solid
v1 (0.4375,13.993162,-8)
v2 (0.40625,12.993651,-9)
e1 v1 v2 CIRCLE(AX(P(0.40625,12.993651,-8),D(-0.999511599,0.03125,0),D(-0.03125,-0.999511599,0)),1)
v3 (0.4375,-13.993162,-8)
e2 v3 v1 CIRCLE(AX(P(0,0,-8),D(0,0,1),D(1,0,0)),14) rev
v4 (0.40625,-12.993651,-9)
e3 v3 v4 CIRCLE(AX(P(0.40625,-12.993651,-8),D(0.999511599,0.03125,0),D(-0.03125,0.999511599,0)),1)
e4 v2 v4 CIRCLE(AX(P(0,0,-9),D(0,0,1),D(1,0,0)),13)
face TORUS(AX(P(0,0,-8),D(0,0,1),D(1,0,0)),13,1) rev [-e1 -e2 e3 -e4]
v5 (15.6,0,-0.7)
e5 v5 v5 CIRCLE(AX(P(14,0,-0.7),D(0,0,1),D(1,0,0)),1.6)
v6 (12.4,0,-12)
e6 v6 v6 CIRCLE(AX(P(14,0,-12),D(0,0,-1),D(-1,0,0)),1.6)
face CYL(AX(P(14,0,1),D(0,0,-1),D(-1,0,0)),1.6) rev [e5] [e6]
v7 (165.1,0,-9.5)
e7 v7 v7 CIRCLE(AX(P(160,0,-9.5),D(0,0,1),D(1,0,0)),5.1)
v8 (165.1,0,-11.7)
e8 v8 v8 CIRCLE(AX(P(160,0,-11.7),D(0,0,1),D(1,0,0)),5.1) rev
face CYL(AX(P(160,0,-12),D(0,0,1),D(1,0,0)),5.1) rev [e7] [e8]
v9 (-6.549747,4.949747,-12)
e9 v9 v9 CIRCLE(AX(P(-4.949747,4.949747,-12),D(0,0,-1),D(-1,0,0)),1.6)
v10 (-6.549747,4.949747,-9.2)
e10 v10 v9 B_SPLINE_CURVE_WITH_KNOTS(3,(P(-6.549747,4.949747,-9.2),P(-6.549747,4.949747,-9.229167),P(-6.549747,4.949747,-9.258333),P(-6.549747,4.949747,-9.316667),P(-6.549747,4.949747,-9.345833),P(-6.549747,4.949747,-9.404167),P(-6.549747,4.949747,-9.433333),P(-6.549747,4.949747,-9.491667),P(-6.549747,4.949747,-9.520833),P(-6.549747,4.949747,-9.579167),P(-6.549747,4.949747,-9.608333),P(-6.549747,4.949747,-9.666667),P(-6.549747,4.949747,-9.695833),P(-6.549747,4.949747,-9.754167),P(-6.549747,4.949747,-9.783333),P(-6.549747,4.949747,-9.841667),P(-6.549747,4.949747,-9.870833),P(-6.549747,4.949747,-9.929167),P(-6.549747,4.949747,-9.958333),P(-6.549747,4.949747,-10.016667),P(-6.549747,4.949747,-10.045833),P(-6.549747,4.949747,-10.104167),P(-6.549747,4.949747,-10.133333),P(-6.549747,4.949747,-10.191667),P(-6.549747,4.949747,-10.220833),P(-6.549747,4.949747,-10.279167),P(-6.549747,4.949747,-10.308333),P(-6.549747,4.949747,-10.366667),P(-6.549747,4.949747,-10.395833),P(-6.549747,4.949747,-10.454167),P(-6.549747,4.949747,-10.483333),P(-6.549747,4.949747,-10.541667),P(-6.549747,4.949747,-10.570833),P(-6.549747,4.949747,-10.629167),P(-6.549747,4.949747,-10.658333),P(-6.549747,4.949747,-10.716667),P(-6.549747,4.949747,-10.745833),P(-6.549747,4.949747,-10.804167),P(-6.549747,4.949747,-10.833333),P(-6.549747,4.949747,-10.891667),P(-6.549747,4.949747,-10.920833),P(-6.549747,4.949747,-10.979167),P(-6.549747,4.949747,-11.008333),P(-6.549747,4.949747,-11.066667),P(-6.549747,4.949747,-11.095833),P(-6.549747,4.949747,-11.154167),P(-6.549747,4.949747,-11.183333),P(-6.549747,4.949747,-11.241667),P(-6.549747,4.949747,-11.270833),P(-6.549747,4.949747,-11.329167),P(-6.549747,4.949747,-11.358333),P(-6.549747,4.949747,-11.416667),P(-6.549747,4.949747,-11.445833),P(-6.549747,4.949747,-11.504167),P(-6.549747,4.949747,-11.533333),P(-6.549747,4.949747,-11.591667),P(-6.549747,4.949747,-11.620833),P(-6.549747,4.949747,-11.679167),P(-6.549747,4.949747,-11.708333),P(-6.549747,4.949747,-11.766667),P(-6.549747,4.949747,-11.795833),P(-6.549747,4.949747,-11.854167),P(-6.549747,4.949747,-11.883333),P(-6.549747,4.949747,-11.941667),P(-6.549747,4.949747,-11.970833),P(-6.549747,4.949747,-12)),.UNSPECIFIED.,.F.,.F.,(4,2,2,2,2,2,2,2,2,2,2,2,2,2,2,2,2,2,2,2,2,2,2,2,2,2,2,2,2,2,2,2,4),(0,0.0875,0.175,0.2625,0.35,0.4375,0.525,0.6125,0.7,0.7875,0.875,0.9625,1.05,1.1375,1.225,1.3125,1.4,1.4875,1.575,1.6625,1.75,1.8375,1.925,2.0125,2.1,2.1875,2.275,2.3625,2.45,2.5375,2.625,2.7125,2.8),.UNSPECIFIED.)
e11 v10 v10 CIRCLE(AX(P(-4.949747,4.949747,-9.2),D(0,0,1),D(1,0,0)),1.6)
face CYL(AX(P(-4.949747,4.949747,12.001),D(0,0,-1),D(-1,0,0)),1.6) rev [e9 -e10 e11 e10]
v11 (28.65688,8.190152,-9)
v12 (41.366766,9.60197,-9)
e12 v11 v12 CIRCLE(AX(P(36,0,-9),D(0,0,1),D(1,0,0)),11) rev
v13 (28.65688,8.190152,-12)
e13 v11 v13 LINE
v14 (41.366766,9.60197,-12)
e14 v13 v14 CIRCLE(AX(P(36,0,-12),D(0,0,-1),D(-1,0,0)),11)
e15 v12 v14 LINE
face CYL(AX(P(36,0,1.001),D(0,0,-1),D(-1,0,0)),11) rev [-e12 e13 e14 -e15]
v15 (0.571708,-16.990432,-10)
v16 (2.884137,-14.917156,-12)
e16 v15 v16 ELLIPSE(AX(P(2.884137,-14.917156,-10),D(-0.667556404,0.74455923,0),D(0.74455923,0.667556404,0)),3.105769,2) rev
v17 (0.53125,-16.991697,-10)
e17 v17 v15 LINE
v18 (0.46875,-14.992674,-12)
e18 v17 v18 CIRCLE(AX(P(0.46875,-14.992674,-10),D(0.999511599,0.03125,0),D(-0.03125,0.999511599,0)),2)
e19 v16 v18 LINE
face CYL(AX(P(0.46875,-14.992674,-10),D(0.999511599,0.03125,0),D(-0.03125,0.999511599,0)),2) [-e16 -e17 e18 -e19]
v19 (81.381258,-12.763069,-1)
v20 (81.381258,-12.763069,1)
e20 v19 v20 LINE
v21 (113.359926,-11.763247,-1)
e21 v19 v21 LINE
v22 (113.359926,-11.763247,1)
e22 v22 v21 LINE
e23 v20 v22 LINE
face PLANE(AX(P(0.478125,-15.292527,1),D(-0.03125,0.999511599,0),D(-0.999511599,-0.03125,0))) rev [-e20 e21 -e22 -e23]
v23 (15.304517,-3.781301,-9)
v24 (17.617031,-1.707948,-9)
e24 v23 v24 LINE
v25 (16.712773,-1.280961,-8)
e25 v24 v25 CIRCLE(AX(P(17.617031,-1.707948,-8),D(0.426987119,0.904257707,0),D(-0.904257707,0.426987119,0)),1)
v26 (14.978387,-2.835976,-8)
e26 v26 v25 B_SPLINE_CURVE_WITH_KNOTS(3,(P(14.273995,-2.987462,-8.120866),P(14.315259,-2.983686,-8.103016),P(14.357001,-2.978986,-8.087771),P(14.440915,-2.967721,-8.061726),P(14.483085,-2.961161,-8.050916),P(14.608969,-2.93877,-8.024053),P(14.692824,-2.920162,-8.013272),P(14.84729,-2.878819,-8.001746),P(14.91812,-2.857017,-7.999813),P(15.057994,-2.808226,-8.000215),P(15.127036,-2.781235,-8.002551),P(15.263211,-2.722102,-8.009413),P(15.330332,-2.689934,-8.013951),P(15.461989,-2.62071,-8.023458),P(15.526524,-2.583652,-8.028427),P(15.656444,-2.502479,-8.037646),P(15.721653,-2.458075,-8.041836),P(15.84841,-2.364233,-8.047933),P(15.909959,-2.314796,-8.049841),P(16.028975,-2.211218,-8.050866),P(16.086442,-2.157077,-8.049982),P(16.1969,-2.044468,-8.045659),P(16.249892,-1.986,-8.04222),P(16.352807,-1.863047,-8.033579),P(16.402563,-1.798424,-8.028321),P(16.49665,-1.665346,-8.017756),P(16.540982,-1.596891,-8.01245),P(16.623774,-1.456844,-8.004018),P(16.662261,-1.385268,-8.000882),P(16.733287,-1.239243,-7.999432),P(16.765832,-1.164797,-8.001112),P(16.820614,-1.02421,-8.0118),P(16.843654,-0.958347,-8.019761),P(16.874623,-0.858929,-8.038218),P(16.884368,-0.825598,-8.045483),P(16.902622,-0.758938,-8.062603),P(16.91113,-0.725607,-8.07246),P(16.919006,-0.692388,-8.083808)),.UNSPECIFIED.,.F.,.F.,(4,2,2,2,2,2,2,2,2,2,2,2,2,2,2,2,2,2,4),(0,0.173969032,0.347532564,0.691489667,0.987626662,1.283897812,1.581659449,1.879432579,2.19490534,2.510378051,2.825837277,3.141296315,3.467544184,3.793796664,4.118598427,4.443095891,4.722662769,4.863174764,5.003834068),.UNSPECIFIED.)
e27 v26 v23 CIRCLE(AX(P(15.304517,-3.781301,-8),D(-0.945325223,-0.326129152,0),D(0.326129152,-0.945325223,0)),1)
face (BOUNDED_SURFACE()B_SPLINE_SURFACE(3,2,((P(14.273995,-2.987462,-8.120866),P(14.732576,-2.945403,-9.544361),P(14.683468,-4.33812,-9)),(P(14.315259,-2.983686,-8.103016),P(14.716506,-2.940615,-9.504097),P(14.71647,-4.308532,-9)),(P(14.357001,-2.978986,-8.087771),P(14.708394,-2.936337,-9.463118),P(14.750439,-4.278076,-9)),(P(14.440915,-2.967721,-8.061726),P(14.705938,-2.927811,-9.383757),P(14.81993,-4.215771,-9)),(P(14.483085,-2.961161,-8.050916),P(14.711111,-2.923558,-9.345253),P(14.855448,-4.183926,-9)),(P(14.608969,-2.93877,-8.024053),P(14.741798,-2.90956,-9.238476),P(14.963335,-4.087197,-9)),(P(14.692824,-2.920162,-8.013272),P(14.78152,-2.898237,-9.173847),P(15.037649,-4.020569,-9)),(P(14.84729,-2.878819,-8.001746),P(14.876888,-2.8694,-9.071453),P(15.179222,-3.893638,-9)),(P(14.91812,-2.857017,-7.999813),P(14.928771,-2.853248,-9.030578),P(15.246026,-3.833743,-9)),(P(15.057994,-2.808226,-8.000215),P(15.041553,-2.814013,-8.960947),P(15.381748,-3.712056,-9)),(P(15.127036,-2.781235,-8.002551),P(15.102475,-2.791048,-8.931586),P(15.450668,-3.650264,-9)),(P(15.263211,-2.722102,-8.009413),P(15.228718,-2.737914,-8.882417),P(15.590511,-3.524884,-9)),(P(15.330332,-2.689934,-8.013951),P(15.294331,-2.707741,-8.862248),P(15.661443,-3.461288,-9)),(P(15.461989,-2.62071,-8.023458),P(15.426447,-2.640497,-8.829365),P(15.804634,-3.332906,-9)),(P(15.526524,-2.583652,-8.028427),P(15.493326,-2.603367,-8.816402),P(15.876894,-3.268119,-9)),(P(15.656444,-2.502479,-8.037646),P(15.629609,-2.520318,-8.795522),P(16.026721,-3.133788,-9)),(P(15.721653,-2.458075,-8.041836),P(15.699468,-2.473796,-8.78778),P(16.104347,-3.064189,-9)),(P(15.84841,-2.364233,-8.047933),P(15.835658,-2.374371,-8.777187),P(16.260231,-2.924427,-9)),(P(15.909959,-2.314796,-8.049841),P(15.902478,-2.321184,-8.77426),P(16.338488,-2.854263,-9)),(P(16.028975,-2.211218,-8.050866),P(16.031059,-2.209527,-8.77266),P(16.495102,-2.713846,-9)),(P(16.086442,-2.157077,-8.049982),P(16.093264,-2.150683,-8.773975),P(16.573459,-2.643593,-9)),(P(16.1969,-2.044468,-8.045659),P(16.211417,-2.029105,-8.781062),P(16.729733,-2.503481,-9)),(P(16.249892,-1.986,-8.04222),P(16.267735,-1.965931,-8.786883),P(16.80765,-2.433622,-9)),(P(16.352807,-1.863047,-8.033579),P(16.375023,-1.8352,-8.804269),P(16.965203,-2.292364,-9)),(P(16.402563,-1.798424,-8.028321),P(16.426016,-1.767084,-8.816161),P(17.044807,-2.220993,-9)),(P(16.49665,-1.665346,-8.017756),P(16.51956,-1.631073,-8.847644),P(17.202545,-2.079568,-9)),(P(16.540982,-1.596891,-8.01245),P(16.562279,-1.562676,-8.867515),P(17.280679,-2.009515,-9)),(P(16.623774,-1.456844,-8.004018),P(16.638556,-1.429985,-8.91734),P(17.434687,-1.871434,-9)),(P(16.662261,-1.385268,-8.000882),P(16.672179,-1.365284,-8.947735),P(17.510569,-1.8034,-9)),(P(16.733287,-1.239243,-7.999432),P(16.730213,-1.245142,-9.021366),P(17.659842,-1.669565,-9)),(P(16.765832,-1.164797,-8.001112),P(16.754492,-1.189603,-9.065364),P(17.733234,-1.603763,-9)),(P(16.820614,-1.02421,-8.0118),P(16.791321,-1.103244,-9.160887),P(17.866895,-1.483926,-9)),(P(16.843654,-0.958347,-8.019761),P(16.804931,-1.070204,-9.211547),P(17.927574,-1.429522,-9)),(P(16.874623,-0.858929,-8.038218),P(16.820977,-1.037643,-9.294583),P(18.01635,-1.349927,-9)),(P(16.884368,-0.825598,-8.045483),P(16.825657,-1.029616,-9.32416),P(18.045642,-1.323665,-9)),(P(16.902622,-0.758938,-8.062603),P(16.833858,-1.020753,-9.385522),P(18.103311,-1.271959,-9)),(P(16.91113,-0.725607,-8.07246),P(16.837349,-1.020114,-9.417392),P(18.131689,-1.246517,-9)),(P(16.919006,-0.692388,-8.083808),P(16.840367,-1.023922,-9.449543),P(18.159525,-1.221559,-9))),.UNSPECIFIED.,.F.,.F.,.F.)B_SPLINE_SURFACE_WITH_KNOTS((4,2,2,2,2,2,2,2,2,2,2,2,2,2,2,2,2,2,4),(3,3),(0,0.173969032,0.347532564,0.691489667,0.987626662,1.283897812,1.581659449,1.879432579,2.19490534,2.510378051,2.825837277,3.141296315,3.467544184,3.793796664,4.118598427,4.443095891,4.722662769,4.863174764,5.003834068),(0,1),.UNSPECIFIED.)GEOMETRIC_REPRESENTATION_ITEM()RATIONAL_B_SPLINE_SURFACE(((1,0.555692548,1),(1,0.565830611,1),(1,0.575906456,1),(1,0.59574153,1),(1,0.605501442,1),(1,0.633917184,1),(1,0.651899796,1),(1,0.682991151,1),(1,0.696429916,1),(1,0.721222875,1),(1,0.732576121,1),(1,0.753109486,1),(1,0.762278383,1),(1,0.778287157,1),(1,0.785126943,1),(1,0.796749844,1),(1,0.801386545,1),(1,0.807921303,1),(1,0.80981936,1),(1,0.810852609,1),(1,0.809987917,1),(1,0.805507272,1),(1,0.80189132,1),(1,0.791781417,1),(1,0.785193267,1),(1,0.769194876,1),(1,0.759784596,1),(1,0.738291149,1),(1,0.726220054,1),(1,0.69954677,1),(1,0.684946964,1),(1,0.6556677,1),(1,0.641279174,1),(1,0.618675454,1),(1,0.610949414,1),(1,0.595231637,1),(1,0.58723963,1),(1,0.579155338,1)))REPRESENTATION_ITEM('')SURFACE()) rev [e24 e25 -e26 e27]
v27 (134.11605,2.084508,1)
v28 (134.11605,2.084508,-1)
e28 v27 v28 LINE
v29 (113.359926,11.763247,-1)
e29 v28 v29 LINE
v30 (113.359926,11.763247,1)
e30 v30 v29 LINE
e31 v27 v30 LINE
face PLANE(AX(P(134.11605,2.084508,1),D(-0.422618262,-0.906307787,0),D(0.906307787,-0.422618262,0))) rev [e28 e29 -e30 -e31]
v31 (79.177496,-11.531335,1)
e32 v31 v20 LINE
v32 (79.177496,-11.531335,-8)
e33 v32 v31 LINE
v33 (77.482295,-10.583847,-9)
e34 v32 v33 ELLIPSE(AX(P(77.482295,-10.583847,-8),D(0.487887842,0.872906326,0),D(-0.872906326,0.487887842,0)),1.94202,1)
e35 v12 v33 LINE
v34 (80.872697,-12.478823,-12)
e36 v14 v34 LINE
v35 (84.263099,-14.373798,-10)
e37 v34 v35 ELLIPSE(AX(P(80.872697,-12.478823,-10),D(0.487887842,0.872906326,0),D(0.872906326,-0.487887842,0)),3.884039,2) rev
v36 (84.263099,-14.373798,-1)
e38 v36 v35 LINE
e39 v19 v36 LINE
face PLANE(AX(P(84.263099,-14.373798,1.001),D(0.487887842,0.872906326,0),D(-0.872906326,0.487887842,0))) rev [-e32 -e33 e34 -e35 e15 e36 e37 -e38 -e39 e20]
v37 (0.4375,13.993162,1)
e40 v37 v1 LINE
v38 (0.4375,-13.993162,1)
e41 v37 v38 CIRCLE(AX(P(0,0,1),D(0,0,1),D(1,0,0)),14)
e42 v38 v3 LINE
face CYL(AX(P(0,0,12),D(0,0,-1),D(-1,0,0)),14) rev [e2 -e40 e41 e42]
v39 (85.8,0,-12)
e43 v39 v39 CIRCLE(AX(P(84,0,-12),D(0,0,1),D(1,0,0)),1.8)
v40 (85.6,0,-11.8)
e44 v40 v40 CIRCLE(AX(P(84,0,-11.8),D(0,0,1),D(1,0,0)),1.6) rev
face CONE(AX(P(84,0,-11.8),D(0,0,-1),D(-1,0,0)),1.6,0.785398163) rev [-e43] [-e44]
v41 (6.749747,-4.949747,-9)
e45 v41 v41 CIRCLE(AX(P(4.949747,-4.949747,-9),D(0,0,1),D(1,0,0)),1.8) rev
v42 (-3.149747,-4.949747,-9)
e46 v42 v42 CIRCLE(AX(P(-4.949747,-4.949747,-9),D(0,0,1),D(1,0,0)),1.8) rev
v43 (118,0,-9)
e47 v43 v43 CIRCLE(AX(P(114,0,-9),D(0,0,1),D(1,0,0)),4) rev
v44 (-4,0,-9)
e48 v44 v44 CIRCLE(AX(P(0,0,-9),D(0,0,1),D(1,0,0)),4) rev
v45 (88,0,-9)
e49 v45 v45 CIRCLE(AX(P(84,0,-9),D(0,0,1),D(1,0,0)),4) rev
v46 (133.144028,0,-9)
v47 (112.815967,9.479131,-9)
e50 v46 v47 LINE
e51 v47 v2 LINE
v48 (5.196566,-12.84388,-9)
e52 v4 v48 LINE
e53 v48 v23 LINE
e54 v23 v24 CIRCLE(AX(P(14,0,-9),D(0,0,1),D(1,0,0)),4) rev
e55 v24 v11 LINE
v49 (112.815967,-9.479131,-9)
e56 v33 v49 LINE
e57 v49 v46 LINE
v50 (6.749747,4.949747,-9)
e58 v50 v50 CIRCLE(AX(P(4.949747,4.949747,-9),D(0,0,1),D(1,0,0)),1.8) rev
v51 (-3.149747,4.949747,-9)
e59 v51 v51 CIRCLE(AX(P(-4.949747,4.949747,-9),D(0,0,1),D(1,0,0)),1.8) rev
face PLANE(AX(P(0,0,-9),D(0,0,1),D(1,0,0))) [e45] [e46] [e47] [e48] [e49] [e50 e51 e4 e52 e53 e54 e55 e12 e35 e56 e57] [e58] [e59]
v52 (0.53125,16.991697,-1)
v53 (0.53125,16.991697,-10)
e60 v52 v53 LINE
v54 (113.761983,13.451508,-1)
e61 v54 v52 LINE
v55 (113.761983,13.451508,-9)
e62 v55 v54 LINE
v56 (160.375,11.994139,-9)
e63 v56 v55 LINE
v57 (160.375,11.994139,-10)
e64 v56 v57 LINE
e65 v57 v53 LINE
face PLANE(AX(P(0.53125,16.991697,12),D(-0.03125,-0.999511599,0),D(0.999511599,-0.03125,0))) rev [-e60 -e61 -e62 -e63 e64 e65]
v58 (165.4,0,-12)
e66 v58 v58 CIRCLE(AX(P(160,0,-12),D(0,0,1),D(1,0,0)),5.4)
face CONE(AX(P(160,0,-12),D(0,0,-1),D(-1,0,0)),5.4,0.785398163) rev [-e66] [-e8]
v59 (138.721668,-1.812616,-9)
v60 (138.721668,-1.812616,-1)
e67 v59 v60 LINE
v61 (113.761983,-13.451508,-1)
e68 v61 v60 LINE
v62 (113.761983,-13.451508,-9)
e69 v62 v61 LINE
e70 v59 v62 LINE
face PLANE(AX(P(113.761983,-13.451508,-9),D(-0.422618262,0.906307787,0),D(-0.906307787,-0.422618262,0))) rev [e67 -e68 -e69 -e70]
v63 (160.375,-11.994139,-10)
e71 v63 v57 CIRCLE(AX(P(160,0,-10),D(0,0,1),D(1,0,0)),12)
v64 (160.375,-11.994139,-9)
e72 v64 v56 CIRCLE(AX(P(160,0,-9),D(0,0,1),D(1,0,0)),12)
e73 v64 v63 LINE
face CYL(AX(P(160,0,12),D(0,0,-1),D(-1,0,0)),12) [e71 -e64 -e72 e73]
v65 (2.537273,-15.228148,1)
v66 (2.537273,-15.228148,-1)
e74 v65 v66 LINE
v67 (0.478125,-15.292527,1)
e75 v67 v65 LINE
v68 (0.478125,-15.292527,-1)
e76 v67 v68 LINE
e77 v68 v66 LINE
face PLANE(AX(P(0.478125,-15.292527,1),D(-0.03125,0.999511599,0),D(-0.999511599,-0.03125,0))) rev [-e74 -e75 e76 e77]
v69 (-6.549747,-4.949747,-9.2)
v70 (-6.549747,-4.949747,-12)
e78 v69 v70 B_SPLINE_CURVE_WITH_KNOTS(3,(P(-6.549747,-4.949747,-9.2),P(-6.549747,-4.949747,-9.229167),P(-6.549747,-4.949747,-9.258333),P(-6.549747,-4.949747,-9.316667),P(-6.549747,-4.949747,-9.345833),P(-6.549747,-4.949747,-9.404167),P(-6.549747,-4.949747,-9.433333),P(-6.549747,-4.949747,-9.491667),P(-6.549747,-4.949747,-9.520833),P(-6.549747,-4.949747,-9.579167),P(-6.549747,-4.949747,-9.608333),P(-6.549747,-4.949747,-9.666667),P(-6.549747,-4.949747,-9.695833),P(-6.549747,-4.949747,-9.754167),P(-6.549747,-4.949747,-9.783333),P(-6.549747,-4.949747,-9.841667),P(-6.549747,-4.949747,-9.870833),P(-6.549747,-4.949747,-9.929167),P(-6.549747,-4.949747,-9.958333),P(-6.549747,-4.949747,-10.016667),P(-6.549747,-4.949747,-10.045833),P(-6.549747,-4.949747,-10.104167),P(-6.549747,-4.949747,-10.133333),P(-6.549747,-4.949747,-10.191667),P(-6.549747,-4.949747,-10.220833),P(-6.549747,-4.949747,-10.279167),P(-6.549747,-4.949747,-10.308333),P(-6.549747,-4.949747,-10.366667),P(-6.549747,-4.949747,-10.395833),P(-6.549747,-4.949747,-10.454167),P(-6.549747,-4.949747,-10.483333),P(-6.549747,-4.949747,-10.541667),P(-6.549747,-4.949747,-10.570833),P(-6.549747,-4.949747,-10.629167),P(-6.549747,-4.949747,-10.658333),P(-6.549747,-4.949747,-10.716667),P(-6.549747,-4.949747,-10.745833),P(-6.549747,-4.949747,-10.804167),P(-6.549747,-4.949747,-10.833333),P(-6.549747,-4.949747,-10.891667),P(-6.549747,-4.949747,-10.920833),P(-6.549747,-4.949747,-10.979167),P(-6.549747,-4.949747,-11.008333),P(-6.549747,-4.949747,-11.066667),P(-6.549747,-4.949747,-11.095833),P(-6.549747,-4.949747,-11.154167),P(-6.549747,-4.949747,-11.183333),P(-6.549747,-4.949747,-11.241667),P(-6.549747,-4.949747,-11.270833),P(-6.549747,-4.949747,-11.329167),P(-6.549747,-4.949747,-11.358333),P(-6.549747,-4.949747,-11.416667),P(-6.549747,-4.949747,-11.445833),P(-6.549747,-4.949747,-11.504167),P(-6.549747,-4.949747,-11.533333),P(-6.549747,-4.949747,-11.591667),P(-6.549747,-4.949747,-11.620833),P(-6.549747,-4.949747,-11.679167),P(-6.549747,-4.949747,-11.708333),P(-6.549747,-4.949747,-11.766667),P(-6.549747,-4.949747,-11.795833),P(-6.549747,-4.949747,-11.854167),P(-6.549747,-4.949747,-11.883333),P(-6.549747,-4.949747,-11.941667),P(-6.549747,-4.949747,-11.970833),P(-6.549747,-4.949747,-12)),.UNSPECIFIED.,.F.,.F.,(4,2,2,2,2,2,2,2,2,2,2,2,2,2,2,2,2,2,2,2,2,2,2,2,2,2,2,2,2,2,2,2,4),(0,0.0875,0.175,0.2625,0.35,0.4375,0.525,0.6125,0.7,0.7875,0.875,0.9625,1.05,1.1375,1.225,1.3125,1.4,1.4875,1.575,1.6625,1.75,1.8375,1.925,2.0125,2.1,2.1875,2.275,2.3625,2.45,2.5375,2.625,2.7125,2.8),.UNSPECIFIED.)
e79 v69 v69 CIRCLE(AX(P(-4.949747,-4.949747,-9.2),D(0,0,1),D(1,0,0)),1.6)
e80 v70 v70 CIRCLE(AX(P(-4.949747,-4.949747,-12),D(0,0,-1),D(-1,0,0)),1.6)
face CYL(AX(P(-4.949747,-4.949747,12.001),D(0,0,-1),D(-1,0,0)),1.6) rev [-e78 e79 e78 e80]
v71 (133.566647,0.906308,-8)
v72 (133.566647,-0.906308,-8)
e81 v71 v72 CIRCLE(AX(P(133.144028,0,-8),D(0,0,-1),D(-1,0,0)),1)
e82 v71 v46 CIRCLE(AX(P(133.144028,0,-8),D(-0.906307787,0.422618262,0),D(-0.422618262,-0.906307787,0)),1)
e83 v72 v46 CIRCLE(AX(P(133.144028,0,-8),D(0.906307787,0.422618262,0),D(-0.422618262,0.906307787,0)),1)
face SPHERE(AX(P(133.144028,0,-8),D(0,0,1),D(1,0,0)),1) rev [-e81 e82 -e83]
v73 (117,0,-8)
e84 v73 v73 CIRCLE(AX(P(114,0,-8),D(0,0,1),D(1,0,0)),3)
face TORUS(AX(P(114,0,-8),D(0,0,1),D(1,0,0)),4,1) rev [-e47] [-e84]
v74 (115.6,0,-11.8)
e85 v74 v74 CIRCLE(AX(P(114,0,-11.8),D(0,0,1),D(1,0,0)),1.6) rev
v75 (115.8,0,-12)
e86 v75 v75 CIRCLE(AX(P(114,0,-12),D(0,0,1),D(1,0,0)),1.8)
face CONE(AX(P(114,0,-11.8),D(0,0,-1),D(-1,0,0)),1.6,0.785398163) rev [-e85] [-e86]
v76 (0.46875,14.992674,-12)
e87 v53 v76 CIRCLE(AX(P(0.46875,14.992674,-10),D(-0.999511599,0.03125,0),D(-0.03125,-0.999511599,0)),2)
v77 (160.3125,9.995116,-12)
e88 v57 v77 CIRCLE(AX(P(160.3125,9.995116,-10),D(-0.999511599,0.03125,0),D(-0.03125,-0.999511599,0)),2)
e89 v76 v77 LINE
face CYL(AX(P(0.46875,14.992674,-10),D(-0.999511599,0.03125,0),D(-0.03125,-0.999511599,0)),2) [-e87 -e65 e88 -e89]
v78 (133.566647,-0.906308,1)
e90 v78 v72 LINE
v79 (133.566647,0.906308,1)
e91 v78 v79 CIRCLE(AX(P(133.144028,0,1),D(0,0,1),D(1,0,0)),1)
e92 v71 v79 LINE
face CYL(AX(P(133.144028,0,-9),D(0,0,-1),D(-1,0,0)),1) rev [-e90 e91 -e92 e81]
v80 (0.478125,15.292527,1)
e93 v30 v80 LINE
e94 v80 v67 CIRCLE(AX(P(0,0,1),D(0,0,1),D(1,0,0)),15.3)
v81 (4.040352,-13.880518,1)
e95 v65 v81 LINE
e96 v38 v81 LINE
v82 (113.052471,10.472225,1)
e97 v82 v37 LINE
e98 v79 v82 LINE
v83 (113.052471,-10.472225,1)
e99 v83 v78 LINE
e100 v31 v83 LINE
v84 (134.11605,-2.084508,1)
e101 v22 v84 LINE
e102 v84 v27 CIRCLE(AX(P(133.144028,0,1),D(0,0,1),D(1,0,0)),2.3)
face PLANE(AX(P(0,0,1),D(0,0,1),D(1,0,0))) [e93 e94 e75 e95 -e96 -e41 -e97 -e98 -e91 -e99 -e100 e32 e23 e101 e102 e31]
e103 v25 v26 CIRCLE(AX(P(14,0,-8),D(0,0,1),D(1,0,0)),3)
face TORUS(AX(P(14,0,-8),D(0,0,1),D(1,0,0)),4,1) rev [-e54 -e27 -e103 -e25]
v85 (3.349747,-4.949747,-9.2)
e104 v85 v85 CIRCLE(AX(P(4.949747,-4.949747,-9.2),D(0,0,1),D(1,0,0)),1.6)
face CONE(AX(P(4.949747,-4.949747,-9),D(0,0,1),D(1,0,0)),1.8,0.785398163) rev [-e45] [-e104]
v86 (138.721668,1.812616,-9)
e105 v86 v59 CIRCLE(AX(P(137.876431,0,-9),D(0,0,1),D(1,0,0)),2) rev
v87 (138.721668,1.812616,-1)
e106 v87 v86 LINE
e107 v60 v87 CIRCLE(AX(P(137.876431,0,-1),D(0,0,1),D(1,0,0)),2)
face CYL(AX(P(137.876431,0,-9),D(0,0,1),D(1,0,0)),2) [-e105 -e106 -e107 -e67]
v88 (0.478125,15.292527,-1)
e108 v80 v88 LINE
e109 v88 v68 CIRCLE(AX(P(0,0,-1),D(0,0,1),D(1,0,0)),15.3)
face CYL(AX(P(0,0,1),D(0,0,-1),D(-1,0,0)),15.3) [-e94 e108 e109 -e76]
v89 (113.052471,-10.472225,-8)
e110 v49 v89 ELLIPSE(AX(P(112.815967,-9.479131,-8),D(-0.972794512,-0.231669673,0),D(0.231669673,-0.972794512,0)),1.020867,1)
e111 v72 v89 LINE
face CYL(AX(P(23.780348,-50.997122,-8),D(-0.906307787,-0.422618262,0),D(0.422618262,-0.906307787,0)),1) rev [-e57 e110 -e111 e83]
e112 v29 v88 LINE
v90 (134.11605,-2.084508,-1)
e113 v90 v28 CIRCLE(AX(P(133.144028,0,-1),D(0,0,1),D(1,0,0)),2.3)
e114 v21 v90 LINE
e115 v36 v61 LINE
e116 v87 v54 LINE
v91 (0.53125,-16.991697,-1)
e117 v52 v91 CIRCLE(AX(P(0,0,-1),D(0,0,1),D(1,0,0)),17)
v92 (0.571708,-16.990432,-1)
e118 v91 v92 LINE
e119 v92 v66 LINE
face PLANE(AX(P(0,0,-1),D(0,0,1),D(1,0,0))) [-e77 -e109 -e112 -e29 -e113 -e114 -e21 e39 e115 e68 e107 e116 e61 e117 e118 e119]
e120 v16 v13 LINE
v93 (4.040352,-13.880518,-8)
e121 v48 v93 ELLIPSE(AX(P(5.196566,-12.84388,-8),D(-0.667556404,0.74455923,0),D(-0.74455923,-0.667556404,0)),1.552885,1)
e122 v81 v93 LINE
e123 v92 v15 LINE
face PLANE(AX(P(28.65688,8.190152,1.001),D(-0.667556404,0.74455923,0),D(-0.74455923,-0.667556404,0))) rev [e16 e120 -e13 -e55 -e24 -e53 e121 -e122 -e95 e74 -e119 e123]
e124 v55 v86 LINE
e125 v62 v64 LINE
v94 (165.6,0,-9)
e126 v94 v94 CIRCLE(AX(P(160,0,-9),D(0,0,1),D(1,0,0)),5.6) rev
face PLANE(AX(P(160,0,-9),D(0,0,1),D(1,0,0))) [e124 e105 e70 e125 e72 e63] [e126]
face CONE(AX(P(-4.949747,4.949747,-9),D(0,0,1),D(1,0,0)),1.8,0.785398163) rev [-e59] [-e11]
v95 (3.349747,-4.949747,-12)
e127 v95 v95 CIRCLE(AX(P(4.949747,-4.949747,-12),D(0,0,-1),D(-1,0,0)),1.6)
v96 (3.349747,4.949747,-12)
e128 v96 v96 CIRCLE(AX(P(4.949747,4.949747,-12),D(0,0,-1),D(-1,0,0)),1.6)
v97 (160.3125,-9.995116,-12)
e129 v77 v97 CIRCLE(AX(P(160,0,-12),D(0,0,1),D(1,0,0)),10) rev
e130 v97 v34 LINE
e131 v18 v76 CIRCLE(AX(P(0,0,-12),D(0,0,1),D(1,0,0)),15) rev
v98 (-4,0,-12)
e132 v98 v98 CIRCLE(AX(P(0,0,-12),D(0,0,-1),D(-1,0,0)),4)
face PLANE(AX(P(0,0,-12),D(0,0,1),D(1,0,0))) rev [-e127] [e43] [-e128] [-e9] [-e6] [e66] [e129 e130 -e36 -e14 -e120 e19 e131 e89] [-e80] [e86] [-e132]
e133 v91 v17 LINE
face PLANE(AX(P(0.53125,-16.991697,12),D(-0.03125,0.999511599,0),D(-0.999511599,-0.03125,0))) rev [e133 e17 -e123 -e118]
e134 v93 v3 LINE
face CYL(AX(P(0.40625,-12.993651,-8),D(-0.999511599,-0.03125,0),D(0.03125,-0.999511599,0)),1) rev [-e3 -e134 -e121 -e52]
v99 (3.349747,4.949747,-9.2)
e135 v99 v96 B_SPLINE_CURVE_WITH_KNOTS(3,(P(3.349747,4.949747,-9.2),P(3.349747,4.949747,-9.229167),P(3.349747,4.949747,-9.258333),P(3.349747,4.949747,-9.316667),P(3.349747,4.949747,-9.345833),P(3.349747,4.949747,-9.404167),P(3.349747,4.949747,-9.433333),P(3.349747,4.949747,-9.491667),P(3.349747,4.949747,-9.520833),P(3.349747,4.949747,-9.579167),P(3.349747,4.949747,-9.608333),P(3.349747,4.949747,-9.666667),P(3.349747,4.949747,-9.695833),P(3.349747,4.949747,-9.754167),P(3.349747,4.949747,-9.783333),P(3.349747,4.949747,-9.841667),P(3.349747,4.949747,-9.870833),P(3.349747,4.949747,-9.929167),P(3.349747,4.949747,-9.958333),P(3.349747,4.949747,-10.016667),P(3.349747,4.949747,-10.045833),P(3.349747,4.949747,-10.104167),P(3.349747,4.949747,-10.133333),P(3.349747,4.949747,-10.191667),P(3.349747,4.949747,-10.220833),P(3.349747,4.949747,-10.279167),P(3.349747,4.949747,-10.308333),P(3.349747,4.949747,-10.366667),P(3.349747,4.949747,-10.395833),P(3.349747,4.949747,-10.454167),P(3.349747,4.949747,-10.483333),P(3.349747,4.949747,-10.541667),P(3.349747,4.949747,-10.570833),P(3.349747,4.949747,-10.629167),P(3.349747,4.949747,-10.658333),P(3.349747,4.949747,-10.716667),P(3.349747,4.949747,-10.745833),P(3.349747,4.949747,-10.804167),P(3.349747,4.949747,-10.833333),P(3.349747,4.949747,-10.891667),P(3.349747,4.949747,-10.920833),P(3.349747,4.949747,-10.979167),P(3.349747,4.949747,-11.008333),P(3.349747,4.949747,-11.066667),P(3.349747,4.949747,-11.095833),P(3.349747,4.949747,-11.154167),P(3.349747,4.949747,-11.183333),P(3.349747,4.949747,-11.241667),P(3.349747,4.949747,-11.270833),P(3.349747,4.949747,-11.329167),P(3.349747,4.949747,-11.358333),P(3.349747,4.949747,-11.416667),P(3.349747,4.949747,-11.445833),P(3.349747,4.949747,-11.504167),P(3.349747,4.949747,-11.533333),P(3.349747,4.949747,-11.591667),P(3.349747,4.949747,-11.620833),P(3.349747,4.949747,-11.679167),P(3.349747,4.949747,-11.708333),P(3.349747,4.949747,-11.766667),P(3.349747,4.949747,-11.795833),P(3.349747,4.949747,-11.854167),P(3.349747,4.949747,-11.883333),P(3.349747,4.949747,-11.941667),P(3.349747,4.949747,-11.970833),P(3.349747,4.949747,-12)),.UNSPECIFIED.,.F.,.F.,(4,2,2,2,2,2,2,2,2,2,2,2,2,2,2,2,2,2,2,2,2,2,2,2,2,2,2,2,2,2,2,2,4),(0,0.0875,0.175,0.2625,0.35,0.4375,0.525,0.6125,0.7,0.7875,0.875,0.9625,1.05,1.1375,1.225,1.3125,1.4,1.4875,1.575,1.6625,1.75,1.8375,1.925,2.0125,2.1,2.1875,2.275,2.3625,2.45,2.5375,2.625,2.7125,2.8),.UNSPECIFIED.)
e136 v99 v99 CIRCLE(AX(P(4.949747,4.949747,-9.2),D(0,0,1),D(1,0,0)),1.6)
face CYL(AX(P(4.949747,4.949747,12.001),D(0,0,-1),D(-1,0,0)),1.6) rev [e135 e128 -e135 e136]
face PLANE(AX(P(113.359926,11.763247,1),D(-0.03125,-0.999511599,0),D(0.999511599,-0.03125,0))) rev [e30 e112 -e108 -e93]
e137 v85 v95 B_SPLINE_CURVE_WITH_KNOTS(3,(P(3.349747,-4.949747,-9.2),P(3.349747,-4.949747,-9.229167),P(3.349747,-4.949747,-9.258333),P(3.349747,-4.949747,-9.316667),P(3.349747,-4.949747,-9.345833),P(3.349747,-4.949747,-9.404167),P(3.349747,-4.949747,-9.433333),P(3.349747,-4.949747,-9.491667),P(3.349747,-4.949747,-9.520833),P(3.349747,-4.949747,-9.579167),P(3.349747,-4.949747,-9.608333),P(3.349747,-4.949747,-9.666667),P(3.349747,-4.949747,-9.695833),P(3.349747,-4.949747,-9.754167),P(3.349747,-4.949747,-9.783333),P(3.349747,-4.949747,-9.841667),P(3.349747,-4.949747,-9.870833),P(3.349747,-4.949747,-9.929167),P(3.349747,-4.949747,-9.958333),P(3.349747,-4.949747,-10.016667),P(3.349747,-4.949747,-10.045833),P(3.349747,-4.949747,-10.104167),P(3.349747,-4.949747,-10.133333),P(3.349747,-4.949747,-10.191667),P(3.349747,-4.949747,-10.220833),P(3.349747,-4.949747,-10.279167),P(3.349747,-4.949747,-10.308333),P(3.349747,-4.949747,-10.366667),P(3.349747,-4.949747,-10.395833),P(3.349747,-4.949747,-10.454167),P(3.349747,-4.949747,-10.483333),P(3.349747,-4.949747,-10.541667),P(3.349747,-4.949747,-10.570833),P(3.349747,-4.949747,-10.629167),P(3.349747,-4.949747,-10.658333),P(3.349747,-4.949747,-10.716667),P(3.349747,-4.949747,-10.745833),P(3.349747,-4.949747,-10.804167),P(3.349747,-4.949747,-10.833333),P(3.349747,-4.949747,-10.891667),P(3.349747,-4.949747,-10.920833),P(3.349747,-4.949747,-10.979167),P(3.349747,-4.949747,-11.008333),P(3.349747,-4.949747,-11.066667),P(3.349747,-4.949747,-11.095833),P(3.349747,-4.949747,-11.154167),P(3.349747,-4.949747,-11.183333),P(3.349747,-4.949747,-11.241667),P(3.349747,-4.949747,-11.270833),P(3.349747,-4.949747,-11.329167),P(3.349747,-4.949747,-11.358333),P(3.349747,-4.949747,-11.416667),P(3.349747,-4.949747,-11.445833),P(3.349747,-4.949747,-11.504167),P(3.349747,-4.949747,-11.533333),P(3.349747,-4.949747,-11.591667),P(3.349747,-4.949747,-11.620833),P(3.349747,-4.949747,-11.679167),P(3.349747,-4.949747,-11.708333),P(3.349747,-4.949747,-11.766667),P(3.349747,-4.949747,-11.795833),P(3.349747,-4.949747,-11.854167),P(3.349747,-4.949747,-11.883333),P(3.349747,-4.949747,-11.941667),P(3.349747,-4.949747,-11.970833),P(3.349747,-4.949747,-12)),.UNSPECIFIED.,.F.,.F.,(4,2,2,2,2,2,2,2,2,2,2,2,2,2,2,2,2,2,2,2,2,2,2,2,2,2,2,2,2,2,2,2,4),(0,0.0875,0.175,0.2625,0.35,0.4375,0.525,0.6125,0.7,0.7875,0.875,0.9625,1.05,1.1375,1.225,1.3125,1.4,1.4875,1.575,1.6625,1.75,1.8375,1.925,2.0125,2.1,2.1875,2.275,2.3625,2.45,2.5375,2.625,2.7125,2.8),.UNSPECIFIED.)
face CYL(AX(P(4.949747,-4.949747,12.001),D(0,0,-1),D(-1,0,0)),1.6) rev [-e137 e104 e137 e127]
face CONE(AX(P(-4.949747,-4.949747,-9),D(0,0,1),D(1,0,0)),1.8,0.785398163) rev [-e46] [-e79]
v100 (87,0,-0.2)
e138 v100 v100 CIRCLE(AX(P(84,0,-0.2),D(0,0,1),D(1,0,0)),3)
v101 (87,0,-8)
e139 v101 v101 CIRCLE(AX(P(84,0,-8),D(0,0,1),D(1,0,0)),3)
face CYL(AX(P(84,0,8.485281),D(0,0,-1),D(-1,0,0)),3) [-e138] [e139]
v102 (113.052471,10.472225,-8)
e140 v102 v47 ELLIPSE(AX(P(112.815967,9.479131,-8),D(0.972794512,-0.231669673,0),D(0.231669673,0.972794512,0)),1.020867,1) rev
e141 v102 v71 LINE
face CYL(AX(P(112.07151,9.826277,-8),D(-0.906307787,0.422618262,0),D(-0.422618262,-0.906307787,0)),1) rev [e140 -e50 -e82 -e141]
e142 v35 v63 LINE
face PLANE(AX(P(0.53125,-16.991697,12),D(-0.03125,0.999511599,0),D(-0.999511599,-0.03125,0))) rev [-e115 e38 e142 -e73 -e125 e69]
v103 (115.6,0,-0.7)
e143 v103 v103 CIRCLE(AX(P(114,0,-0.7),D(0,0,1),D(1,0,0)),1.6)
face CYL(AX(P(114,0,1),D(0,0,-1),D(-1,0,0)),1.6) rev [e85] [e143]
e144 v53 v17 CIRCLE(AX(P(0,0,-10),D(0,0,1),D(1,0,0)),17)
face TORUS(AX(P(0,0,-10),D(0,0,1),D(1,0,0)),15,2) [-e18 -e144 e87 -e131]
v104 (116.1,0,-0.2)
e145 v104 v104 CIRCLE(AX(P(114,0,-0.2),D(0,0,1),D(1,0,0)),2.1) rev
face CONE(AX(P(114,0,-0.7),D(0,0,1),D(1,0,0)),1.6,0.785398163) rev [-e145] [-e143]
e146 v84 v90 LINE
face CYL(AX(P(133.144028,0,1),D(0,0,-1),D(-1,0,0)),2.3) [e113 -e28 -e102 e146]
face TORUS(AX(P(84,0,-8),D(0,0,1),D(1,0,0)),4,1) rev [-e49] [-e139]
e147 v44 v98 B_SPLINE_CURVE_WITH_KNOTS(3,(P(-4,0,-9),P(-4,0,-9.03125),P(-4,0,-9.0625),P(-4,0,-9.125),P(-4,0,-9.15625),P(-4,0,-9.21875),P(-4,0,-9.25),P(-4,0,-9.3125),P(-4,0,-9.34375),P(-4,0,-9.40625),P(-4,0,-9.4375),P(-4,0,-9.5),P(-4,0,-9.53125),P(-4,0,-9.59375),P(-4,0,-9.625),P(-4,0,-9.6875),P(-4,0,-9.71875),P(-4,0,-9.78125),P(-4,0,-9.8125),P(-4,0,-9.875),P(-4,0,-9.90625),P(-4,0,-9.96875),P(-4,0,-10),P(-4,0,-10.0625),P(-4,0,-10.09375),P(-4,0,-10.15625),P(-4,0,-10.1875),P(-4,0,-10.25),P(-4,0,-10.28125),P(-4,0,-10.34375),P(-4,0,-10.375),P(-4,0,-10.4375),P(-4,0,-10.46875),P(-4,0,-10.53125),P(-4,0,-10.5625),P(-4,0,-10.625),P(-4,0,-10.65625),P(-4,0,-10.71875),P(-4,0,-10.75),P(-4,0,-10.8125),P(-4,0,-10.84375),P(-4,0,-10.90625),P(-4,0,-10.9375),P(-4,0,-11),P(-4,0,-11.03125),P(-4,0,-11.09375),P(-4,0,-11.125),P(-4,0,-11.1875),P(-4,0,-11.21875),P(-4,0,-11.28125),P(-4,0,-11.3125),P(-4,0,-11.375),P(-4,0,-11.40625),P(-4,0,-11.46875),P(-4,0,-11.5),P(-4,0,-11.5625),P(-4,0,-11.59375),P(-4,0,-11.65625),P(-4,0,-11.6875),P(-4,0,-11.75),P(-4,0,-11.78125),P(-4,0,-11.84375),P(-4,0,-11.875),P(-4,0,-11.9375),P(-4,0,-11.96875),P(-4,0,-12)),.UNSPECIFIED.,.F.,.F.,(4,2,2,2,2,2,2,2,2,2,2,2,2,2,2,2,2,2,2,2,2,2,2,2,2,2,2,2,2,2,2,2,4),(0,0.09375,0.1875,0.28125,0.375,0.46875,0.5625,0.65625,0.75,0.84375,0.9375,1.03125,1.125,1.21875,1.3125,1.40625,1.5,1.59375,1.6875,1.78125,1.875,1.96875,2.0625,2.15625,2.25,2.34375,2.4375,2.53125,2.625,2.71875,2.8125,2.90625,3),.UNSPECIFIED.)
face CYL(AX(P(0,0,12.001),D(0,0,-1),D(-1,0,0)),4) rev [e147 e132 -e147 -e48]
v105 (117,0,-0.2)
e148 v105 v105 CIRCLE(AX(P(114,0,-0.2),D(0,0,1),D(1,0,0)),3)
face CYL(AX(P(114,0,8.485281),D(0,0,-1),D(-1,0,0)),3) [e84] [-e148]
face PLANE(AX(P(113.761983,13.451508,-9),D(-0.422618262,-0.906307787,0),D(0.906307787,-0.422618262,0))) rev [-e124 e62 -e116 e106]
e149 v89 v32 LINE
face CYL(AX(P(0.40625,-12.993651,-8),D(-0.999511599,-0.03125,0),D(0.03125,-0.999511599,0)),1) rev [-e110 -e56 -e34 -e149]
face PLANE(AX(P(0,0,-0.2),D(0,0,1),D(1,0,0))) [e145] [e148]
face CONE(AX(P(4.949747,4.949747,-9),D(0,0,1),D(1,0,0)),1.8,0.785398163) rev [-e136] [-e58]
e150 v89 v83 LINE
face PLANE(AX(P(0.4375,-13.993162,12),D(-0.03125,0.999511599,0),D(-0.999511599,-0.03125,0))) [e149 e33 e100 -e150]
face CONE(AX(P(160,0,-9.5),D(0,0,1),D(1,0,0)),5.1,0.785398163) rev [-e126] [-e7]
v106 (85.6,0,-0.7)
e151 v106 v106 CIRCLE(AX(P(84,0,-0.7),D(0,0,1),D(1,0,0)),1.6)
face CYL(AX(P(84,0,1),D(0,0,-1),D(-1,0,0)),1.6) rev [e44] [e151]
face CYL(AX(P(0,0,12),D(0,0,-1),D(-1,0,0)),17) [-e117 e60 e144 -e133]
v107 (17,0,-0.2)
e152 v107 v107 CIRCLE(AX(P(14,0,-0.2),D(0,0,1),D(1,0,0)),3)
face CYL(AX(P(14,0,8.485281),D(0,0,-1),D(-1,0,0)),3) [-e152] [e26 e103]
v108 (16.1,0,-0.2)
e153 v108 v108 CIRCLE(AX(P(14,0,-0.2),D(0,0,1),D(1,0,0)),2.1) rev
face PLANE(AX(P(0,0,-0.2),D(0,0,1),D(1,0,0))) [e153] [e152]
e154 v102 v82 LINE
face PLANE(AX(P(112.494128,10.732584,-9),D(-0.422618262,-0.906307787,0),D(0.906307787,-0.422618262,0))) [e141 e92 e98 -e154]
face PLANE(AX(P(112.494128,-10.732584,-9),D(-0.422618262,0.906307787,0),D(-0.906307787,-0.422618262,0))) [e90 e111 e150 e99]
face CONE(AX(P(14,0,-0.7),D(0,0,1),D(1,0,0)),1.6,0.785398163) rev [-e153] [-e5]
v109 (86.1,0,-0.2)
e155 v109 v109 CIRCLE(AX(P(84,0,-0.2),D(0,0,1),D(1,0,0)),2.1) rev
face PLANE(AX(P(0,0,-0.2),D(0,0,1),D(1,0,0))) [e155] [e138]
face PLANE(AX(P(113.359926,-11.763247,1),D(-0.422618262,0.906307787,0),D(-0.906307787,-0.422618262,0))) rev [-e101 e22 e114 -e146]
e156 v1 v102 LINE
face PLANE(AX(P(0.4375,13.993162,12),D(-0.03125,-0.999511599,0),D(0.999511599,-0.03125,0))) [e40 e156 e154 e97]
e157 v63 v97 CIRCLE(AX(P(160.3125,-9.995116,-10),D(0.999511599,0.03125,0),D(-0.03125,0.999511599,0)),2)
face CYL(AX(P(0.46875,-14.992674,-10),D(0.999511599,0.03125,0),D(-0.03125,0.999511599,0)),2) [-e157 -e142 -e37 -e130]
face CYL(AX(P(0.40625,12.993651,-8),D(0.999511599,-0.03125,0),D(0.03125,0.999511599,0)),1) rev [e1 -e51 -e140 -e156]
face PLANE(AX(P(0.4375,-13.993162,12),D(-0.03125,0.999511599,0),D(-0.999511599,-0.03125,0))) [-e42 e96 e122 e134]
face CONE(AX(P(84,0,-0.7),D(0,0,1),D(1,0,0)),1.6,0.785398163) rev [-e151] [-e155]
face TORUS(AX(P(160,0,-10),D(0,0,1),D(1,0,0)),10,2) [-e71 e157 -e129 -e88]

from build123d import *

# Parameters (mm, degrees)
BOSS_EXTRUDE1_DEPTH     = 12
CUT_EXTRUDE7_DEPTH      = 9
CUT_EXTRUDE3_DEPTH      = 175.496418301
CUT_EXTRUDE3_DEPTH_BACK = 175.496418301
SKETCH4_R               = 5.1
SHELL1_START            = -9
SHELL1_DEPTH            = 18
FILLET1_R               = 2
FILLET2_R               = 1
CUT_EXTRUDE8_REACH      = 176.496
SKETCH9_R               = 1.6
SKETCH9_R_2             = 4
CUT_EXTRUDE9_REACH      = 176.496
SKETCH10_R              = 4
BOSS_EXTRUDE2_DEPTH     = 1
CUT_EXTRUDE10_DEPTH     = 1
CUT_EXTRUDE12_REACH     = 175.326
SKETCH17_R              = 3
BOSS_EXTRUDE3_DEPTH     = 8.8
SKETCH20_R              = 1.6
CUT_EXTRUDE13_DEPTH     = 174.326281908
FILLET3_R               = 1
FILLET4_R               = 1
FILLET5_R               = 2
CHAMFER1_SIZE           = 0.5
CHAMFER2_SIZE           = 0.5
CHAMFER3_SIZE           = 0.2
CHAMFER4_SIZE           = 0.2
CHAMFER5_SIZE           = 0.3


# Read off the part's stored shape, not the designer's step: Shell1
with BuildPart() as part:
    # Sketch1 → Boss-Extrude1 (new, symmetric)
    with BuildSketch(Plane.XY):
        with BuildLine():
            Line((0.53125, 16.991697191), (160.375, 11.994139194))
            ThreePointArc((160.375, 11.994139194), (172, 0), (160.375, -11.994139194))
            Line((160.375, -11.994139194), (0.53125, -16.991697191))
            ThreePointArc((0.53125, -16.991697191), (-17, 0), (0.53125, 16.991697191))
        make_face()
    extrude(amount=BOSS_EXTRUDE1_DEPTH, both=True)

    # Sketch8 → Cut-Extrude7 (cut, symmetric)
    with BuildSketch(Plane.XY):
        with BuildLine():
            Line((113.761983187, 13.451507749), (142.608834646, 0))
            Line((142.608834646, 0), (113.761983187, -13.451507749))
            Line((113.761983187, -13.451507749), (160.375, -11.994139194))
            ThreePointArc((160.375, -11.994139194), (172, 0), (160.375, 11.994139194))
            Line((160.375, 11.994139194), (113.761983187, 13.451507749))
        make_face()
    extrude(amount=CUT_EXTRUDE7_DEPTH, both=True, mode=Mode.SUBTRACT)

    # Sketch4 → Cut-Extrude3 (cut, two sides: drawn at the far end of the back side and taken through both)
    with BuildSketch(Plane.XY.offset(12).offset(-CUT_EXTRUDE3_DEPTH_BACK)):
        with Locations((160, 0)):
            Circle(SKETCH4_R)
    extrude(amount=CUT_EXTRUDE3_DEPTH + CUT_EXTRUDE3_DEPTH_BACK, mode=Mode.SUBTRACT)

    # Shell1 outline → Shell1 (cut)
    with BuildSketch(Plane.XY.offset(SHELL1_START)):
        with BuildLine():
            Line((0.4375, -13.993162393), (113.052471085, -10.472224919))
            Line((113.052471085, -10.472224919), (135.510229896, 0))
            Line((135.510229896, 0), (113.052471085, 10.472224919))
            Line((113.052471085, 10.472224919), (0.4375, 13.993162393))
            ThreePointArc((0.4375, 13.993162393), (-14, 0), (0.4375, -13.993162393))
        make_face()
    extrude(amount=SHELL1_DEPTH, mode=Mode.SUBTRACT)

    # Fillet1
    fillet1_edges = [part.edges().sort_by_distance(p)[0] for p in [
        (142.608834646, 0, 0),
    ]]
    fillet(fillet1_edges, radius=FILLET1_R)

    # Fillet2
    fillet2_edges = [part.edges().sort_by_distance(p)[0] for p in [
        (135.510229896, 0, 0),
    ]]
    fillet(fillet2_edges, radius=FILLET2_R)

    # Sketch9 → Cut-Extrude8 (cut, up to next)
    with BuildSketch(Plane(origin=(0, 0, -12), x_dir=(-1, 0, 0), z_dir=(0, 0, -1)), mode=Mode.PRIVATE) as cut_extrude8_sk1:
        with Locations((-4.949747468, 4.949747468)):
            Circle(SKETCH9_R)
    cut_extrude8_tool1 = extrude(cut_extrude8_sk1.sketch, amount=-CUT_EXTRUDE8_REACH, mode=Mode.PRIVATE) & part.part
    # Sketch9 → Cut-Extrude8 (cut, up to next)
    with BuildSketch(Plane(origin=(0, 0, -12), x_dir=(-1, 0, 0), z_dir=(0, 0, -1)), mode=Mode.PRIVATE) as cut_extrude8_sk2:
        with Locations((4.949747468, 4.949747468)):
            Circle(SKETCH9_R)
    cut_extrude8_tool2 = extrude(cut_extrude8_sk2.sketch, amount=-CUT_EXTRUDE8_REACH, mode=Mode.PRIVATE) & part.part
    # Sketch9 → Cut-Extrude8 (cut, up to next)
    with BuildSketch(Plane(origin=(0, 0, -12), x_dir=(-1, 0, 0), z_dir=(0, 0, -1)), mode=Mode.PRIVATE) as cut_extrude8_sk3:
        with Locations((4.949747468, -4.949747468)):
            Circle(SKETCH9_R)
    cut_extrude8_tool3 = extrude(cut_extrude8_sk3.sketch, amount=-CUT_EXTRUDE8_REACH, mode=Mode.PRIVATE) & part.part
    # Sketch9 → Cut-Extrude8 (cut, up to next)
    with BuildSketch(Plane(origin=(0, 0, -12), x_dir=(-1, 0, 0), z_dir=(0, 0, -1)), mode=Mode.PRIVATE) as cut_extrude8_sk4:
        with Locations((-4.949747468, -4.949747468)):
            Circle(SKETCH9_R)
    cut_extrude8_tool4 = extrude(cut_extrude8_sk4.sketch, amount=-CUT_EXTRUDE8_REACH, mode=Mode.PRIVATE) & part.part
    # Sketch9 → Cut-Extrude8 (cut, up to next)
    with BuildSketch(Plane(origin=(0, 0, -12), x_dir=(-1, 0, 0), z_dir=(0, 0, -1)), mode=Mode.PRIVATE) as cut_extrude8_sk5:
        Circle(SKETCH9_R_2)
    cut_extrude8_tool5 = extrude(cut_extrude8_sk5.sketch, amount=-CUT_EXTRUDE8_REACH, mode=Mode.PRIVATE) & part.part
    add(cut_extrude8_tool1.solids().sort_by_distance((4.949747, 4.949747, -12))[0], mode=Mode.SUBTRACT)
    add(cut_extrude8_tool2.solids().sort_by_distance((-4.949747, 4.949747, -12))[0], mode=Mode.SUBTRACT)
    add(cut_extrude8_tool3.solids().sort_by_distance((-4.949747, -4.949747, -12))[0], mode=Mode.SUBTRACT)
    add(cut_extrude8_tool4.solids().sort_by_distance((4.949747, -4.949747, -12))[0], mode=Mode.SUBTRACT)
    add(cut_extrude8_tool5.solids().sort_by_distance((0, 0, -12))[0], mode=Mode.SUBTRACT)

    # Sketch10 → Cut-Extrude9 (cut, up to next)
    with BuildSketch(Plane.XY.offset(12), mode=Mode.PRIVATE) as cut_extrude9_sk1:
        with Locations(Location((0, 0, 0), (0, 0, 180))):
            Circle(SKETCH10_R)
    cut_extrude9_tool1 = extrude(cut_extrude9_sk1.sketch, amount=-CUT_EXTRUDE9_REACH, mode=Mode.PRIVATE) & part.part
    add(cut_extrude9_tool1.solids().sort_by_distance((0, 0, 12))[0], mode=Mode.SUBTRACT)

    # SurfaceCut1
    split(bisect_by=Plane.XY, keep=Keep.BOTTOM)

    # Sketch12 → Boss-Extrude2 (add)
    with BuildSketch(Plane.XY):
        with BuildLine():
            Line((113.359926329, 11.763247478), (0.478125, 15.292527472))
            ThreePointArc((0.478125, 15.292527472), (-15.3, 0), (0.478125, -15.292527472))
            Line((0.478125, -15.292527472), (113.359926329, -11.763247478))
            Line((113.359926329, -11.763247478), (134.116050315, -2.08450791))
            ThreePointArc((134.116050315, -2.08450791), (135.444028313, 0), (134.116050315, 2.08450791))
            Line((134.116050315, 2.08450791), (113.359926329, 11.763247478))
        make_face()
        with BuildLine():
            Line((113.052471085, 10.472224919), (0.4375, 13.993162393))
            ThreePointArc((0.4375, 13.993162393), (-14, 0), (0.4375, -13.993162393))
            Line((0.4375, -13.993162393), (113.052471085, -10.472224919))
            Line((113.052471085, -10.472224919), (133.566646575, -0.906307787))
            ThreePointArc((133.566646575, -0.906307787), (134.144028313, 0), (133.566646575, 0.906307787))
            Line((133.566646575, 0.906307787), (113.052471085, 10.472224919))
        make_face(mode=Mode.SUBTRACT)
    extrude(amount=BOSS_EXTRUDE2_DEPTH)

    # Sketch13 → Cut-Extrude10 (cut)
    with BuildSketch(Plane.XY):
        with BuildLine():
            Line((113.761983187, 13.451507749), (0.53125, 16.991697191))
            ThreePointArc((0.53125, 16.991697191), (-17, 0), (0.53125, -16.991697191))
            Line((0.53125, -16.991697191), (113.761983187, -13.451507749))
            Line((113.761983187, -13.451507749), (138.721668003, -1.812615574))
            ThreePointArc((138.721668003, -1.812615574), (139.876431479, 0), (138.721668003, 1.812615574))
            Line((138.721668003, 1.812615574), (113.761983187, 13.451507749))
        make_face()
        with BuildLine():
            Line((113.359926329, 11.763247478), (0.478125, 15.292527472))
            ThreePointArc((0.478125, 15.292527472), (-15.3, 0), (0.478125, -15.292527472))
            Line((0.478125, -15.292527472), (113.359926329, -11.763247478))
            Line((113.359926329, -11.763247478), (134.116050315, -2.08450791))
            ThreePointArc((134.116050315, -2.08450791), (135.444028313, 0), (134.116050315, 2.08450791))
            Line((134.116050315, 2.08450791), (113.359926329, 11.763247478))
        make_face(mode=Mode.SUBTRACT)
    extrude(amount=-CUT_EXTRUDE10_DEPTH, mode=Mode.SUBTRACT)

    # Sketch15 → Cut-Extrude12 (cut, up to next)
    with BuildSketch(Plane(origin=(0, 0, -12), x_dir=(-1, 0, 0), z_dir=(0, 0, -1)), mode=Mode.PRIVATE) as cut_extrude12_sk1:
        with BuildLine():
            Line((-84.263099493, -14.373798311), (-0.571708086, -16.990432258))
            Line((-0.571708086, -16.990432258), (-28.656879553, 8.190151531))
            ThreePointArc((-28.656879553, 8.190151531), (-34.785585937, 10.932758046), (-41.366766264, 9.601969583))
            Line((-41.366766264, 9.601969583), (-84.263099493, -14.373798311))
        make_face()
    cut_extrude12_tool1 = extrude(cut_extrude12_sk1.sketch, amount=-CUT_EXTRUDE12_REACH, mode=Mode.PRIVATE) & part.part
    add(cut_extrude12_tool1.solids().sort_by_distance((39.828066, -6.13947, -12))[0], mode=Mode.SUBTRACT)

    # Sketch17 → Boss-Extrude3 (add)
    with BuildSketch(Plane.XY.offset(-9)):
        with Locations((14, 0)):
            Circle(SKETCH17_R)
        with Locations((84, 0)):
            Circle(SKETCH17_R)
        with Locations((114, 0)):
            Circle(SKETCH17_R)
    extrude(amount=BOSS_EXTRUDE3_DEPTH)

    # Sketch20 → Cut-Extrude13 (cut, through all)
    with BuildSketch(Plane(origin=(0, 0, -12), x_dir=(-1, 0, 0), z_dir=(0, 0, -1))):
        with Locations((-14, 0)):
            Circle(SKETCH20_R)
        with Locations((-84, 0)):
            Circle(SKETCH20_R)
        with Locations((-114, 0)):
            Circle(SKETCH20_R)
    extrude(amount=-CUT_EXTRUDE13_DEPTH, mode=Mode.SUBTRACT)

    # Fillet3
    fillet3_edges = [part.edges().sort_by_distance(p)[0] for p in [
        (11, 0, -9),
        (81, 0, -9),
        (111, 0, -9),
    ]]
    fillet(fillet3_edges, radius=FILLET3_R)

    # Fillet4
    fillet4_edges = [part.edges().sort_by_distance(p)[0] for p in [
        (96.11498359, -11.001780038, -9),
        (2.238925782, -13.93684033, -9),
        (56.744985542, 12.232693656, -9),
        (-14, 0, -9),
        (123.30955883, 5.689266353, -9),
        (123.30955883, -5.689266353, -9),
        (134.144028313, 0, -9),
    ]]
    fillet(fillet4_edges, radius=FILLET4_R)

    # Fillet5
    fillet5_edges = [part.edges().sort_by_distance(p)[0] for p in [
        (122.319049746, -13.183968753, -12),
        (80.453125, 14.492918192, -12),
        (172, 0, -12),
        (0.551479043, -16.991064725, -12),
        (-17, 0, -12),
    ]]
    fillet(fillet5_edges, radius=FILLET5_R)

    # Chamfer1
    chamfer1_edges = [part.edges().sort_by_distance(p)[0] for p in [
        (154.9, 0, -9),
    ]]
    chamfer(chamfer1_edges, length=CHAMFER1_SIZE)

    # Chamfer2
    chamfer2_edges = [part.edges().sort_by_distance(p)[0] for p in [
        (15.6, 0, -0.2),
        (85.6, 0, -0.2),
        (115.6, 0, -0.2),
    ]]
    chamfer(chamfer2_edges, length=CHAMFER2_SIZE)

    # Chamfer3
    chamfer3_edges = [part.edges().sort_by_distance(p)[0] for p in [
        (85.6, 0, -12),
        (115.6, 0, -12),
    ]]
    chamfer(chamfer3_edges, length=CHAMFER3_SIZE)

    # Chamfer4
    chamfer4_edges = [part.edges().sort_by_distance(p)[0] for p in [
        (6.549747468, 4.949747468, -9),
        (6.549747468, -4.949747468, -9),
        (-3.349747468, -4.949747468, -9),
        (-3.349747468, 4.949747468, -9),
    ]]
    chamfer(chamfer4_edges, length=CHAMFER4_SIZE)

    # Chamfer5
    chamfer5_edges = [part.edges().sort_by_distance(p)[0] for p in [
        (154.9, 0, -12),
    ]]
    chamfer(chamfer5_edges, length=CHAMFER5_SIZE)


solid = part.part
